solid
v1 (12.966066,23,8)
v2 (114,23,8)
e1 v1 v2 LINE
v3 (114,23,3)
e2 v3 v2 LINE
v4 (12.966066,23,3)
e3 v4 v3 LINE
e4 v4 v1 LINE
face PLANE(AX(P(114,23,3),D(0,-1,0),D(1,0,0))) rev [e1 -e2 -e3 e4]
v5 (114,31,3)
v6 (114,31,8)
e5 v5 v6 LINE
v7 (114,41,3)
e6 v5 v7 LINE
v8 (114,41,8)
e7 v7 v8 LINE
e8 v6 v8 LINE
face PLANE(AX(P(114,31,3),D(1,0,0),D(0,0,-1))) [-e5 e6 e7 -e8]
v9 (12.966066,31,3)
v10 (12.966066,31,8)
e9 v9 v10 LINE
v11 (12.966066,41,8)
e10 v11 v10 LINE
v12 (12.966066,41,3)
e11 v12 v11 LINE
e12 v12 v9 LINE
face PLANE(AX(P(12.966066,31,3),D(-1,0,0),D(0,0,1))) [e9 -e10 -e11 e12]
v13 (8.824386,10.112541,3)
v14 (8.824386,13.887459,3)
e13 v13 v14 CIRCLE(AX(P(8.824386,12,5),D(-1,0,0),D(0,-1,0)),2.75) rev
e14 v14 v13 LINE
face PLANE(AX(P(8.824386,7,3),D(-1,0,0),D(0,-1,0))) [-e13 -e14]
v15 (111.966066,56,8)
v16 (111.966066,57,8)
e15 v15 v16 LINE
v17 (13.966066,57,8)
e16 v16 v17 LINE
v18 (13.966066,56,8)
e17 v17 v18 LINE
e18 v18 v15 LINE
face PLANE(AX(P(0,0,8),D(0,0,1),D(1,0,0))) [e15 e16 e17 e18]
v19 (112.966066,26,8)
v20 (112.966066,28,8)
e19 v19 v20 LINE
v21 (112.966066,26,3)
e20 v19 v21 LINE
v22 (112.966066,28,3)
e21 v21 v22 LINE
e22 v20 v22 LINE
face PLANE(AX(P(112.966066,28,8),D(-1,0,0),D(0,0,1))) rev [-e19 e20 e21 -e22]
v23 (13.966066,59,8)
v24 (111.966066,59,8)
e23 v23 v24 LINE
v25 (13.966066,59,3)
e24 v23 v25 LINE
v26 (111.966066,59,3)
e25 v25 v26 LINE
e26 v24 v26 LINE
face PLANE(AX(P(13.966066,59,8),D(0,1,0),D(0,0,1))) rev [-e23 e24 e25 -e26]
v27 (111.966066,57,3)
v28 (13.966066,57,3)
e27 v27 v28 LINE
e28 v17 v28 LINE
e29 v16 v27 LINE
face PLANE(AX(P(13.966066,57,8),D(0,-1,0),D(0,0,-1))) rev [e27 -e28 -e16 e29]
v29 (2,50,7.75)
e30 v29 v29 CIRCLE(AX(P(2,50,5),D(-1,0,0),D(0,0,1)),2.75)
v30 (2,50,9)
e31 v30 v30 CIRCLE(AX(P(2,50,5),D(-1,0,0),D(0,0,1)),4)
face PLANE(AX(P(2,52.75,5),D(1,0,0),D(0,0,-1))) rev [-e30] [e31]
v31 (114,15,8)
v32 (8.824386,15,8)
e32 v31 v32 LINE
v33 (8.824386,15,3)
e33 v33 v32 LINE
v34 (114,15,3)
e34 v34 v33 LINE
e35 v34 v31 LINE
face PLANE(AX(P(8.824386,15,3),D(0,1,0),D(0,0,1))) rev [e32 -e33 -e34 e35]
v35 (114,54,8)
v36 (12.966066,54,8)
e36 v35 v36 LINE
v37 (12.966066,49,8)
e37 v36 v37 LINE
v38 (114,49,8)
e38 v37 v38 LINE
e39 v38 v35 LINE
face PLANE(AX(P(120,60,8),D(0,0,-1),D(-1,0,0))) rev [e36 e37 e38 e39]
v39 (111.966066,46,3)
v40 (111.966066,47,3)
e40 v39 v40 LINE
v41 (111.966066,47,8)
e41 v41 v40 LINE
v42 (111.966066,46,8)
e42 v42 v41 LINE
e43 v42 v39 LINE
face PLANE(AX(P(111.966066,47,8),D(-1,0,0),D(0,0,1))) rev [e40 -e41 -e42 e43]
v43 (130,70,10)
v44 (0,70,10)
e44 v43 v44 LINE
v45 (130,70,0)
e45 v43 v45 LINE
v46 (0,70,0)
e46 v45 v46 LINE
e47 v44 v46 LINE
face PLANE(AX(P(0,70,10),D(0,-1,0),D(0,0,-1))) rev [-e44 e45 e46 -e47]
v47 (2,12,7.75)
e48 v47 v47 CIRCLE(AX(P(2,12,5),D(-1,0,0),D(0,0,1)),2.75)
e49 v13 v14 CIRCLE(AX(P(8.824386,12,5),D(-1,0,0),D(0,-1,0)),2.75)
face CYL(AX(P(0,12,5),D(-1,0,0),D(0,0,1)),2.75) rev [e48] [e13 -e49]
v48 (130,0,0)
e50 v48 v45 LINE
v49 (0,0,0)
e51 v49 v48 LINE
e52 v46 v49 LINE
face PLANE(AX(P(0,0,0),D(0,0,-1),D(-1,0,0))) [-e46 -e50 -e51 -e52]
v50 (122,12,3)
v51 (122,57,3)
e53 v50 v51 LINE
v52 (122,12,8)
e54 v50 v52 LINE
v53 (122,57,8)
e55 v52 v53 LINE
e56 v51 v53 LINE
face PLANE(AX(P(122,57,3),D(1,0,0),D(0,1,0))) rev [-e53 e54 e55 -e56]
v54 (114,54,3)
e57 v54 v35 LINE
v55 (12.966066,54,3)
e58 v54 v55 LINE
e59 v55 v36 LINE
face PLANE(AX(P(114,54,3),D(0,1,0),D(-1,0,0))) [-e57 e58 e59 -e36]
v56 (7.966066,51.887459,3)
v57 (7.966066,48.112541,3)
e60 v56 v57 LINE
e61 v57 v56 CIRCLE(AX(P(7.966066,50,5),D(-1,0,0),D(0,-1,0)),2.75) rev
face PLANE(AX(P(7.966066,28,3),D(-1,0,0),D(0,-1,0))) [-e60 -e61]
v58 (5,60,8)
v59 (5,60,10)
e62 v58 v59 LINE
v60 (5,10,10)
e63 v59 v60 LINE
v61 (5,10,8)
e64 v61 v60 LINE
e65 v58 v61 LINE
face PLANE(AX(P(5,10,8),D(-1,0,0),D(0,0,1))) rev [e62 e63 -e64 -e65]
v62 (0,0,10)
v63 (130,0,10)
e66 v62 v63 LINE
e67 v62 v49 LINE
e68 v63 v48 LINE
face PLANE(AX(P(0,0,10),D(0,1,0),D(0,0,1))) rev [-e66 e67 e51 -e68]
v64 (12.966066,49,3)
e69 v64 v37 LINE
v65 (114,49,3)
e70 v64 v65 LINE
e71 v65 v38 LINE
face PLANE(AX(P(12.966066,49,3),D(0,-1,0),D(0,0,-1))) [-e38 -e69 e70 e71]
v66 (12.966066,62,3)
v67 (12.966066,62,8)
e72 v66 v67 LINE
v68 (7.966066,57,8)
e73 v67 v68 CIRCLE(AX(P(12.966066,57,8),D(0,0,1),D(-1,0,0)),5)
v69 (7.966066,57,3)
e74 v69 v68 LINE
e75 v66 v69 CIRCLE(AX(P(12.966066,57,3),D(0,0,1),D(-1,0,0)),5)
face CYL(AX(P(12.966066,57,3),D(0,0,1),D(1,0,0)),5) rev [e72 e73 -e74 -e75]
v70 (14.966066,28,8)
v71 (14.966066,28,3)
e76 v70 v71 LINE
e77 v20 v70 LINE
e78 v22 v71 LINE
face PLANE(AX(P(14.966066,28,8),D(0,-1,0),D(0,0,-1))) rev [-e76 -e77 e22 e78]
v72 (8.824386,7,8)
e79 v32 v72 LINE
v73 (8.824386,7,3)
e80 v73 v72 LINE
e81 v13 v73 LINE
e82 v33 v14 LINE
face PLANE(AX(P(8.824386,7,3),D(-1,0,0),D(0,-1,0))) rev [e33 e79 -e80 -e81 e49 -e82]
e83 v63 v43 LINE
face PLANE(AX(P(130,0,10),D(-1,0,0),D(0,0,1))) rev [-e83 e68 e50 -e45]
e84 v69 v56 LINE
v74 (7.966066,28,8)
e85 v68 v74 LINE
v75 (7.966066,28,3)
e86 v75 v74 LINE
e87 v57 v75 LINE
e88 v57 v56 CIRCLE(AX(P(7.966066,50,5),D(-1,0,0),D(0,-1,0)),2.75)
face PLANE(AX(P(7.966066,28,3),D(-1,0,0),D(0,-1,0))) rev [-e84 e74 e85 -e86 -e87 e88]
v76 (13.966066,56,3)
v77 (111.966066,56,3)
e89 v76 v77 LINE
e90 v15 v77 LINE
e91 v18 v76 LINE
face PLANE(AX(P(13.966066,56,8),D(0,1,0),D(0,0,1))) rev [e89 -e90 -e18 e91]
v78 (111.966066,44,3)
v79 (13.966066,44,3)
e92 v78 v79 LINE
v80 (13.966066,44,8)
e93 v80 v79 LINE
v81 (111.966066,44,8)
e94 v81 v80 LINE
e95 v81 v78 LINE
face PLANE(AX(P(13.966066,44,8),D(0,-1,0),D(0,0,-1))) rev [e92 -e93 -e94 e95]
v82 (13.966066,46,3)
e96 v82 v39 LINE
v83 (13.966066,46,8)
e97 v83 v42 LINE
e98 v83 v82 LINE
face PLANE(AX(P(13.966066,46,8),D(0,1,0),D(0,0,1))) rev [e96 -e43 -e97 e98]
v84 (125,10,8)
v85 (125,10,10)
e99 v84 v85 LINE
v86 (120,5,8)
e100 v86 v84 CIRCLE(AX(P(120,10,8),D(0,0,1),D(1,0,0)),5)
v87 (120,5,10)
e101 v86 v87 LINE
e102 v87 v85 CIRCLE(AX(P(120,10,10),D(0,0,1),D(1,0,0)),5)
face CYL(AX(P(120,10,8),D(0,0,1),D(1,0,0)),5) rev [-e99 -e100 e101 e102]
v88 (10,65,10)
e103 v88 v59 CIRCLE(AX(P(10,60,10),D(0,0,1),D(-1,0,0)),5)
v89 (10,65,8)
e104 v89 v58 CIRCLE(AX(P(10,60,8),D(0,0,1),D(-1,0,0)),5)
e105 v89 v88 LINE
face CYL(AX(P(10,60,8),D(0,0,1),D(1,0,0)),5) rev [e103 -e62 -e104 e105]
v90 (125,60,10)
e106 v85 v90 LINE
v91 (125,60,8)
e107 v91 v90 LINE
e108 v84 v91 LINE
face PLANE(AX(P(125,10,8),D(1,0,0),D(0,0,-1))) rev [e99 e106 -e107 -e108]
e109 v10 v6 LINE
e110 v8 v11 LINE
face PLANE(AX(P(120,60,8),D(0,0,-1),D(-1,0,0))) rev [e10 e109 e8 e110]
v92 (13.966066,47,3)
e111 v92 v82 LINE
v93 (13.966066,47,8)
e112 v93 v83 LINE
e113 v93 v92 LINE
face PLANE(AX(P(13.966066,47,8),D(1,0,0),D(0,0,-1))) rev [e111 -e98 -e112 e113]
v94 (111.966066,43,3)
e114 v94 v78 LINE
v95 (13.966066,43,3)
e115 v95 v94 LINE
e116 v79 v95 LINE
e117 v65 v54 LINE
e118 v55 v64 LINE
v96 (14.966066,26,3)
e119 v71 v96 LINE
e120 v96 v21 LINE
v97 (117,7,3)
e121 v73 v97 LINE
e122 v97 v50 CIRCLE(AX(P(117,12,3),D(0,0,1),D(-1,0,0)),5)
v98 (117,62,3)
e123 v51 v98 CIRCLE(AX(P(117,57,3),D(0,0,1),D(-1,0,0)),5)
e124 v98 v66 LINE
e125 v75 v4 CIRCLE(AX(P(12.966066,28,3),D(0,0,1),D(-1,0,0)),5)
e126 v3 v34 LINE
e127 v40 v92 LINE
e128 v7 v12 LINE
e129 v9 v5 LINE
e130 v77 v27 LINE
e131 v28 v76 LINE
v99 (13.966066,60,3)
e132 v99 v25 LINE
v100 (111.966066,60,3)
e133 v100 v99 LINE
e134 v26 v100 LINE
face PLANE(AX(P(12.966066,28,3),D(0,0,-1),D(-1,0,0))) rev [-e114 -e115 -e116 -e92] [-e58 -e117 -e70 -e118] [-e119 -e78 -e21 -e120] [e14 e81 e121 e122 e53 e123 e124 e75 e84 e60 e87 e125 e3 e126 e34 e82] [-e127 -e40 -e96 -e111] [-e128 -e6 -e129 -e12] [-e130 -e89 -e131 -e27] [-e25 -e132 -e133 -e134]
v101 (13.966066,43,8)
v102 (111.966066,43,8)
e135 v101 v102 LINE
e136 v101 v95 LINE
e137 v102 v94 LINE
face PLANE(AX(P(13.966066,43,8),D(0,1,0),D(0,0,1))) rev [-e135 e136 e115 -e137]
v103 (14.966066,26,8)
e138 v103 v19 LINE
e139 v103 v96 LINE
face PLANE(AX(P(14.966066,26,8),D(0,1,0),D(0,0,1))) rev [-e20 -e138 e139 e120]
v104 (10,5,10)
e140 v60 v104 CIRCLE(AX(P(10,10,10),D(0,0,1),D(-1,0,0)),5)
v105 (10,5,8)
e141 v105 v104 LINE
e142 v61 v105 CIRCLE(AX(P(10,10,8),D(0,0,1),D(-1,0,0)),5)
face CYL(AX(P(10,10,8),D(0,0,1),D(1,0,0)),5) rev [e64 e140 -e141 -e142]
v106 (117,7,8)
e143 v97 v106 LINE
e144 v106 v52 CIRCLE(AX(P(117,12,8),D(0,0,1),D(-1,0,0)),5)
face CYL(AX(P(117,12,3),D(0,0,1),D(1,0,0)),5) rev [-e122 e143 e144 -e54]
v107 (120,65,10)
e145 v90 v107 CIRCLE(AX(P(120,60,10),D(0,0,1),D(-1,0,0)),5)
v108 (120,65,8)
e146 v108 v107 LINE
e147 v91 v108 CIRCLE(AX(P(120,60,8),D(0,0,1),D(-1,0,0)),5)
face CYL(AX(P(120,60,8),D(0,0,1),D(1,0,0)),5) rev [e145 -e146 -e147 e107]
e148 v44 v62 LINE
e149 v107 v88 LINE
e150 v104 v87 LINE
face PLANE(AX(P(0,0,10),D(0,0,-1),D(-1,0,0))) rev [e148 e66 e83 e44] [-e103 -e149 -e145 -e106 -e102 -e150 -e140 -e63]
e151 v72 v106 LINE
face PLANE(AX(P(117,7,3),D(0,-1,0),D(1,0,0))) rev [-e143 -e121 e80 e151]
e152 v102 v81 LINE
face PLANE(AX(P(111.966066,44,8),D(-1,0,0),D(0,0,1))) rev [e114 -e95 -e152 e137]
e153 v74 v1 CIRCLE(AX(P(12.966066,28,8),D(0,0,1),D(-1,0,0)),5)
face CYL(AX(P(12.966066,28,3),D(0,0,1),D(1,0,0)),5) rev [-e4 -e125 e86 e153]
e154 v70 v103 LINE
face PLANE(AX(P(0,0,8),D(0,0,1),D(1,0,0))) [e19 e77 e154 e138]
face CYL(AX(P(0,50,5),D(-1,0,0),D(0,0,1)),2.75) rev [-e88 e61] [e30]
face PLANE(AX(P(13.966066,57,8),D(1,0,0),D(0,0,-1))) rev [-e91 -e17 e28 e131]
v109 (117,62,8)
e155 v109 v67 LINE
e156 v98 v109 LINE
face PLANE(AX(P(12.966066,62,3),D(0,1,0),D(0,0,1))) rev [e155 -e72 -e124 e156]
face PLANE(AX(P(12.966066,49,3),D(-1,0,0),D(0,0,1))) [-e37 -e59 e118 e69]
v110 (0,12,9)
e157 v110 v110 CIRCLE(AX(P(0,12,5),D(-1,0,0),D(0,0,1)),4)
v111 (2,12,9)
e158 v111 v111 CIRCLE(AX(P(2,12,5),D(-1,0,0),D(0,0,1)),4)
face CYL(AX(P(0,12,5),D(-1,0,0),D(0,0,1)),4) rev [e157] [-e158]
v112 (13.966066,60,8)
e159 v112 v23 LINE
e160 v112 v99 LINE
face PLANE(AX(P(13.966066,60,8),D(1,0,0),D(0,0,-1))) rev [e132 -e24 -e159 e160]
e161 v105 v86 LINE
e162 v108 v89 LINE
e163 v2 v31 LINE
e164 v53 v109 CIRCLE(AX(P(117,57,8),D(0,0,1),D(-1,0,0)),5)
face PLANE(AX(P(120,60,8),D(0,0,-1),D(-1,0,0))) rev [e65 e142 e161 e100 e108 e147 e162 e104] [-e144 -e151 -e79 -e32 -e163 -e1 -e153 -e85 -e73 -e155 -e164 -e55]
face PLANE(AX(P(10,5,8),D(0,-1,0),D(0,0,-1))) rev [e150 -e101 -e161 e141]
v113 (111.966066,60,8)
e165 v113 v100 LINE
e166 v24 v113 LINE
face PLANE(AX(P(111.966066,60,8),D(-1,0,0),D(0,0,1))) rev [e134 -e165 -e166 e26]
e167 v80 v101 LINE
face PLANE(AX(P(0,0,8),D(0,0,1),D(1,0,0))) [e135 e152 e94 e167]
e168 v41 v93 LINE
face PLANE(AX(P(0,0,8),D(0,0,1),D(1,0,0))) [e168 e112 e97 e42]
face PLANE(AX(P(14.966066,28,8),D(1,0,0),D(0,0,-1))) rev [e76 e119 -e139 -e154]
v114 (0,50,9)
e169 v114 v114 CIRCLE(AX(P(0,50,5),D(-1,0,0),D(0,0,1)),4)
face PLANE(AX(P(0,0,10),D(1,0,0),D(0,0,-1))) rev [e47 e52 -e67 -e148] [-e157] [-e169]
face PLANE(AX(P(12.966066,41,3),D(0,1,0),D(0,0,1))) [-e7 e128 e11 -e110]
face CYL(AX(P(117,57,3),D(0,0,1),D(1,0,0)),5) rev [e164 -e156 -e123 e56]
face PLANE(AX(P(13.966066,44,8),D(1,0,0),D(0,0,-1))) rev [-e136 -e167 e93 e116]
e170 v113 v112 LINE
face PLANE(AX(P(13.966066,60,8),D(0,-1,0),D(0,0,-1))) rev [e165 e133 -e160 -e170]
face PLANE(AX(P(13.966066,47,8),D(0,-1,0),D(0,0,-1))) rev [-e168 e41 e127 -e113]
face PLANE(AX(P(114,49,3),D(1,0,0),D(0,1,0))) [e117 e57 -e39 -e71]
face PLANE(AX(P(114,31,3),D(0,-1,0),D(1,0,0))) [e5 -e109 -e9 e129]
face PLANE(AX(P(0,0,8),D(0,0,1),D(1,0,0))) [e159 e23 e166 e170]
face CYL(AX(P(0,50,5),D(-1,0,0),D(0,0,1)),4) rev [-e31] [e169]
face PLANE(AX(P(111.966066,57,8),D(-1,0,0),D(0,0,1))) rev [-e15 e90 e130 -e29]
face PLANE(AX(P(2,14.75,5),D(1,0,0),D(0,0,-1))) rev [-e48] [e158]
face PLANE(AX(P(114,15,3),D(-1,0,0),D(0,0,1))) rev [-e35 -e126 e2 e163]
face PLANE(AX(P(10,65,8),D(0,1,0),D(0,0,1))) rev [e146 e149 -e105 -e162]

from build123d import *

# Parameters (mm, degrees)
ESQUISSE1_W                                 = 130
ESQUISSE1_H                                 = 70
BOSS_EXTRU_1_DEPTH                          = 10
ENL_V_MAT_EXTRU_1_DEPTH                     = 2
ESQUISSE20_W                                = 101.033933646
ESQUISSE20_H                                = 5
ESQUISSE20_H_2                              = 10
ENL_V_MAT_EXTRU_3_DEPTH                     = 5
CHAMBRAGE_POUR_VIS_SIX_PANS_CREUX_2_R       = 2.75
CHAMBRAGE_POUR_VIS_SIX_PANS_CREUX_M52_DEPTH = 7.966066354
CHAMBRAGE_POUR_VIS_SIX_PANS_CREUX_3_OU_R    = 4
CHAMBRAGE_POUR_VIS_SIX_PANS_CREUX_3_OU_R_2  = 2.75
CHAMBRAGE_POUR_VIS_SIX_PANS_CREUX_3_DEPTH   = 2
CHAMBRAGE_START                             = 7.966066354
CHAMBRAGE_POUR_VIS_SIX_PANS_CREUX_4_OU_R    = 2.75
CHAMBRAGE_POUR_VIS_SIX_PANS_CREUX_4_DEPTH   = 0.858319246
ESQUISSE23_W                                = 98
ESQUISSE23_H                                = 1
ESQUISSE23_H_2                              = 2
BOSS_EXTRU_2_DEPTH                          = 5


# Read off the part's stored shape, not the designer's step: Chambrage pour vis à six pans creux M52
with BuildPart() as part:
    # Esquisse1 → Boss.-Extru.1 (new body)
    with BuildSketch(Plane.XY):
        with Locations((65, 35)):
            Rectangle(ESQUISSE1_W, ESQUISSE1_H)
    extrude(amount=BOSS_EXTRU_1_DEPTH)

    # Esquisse18 → Enlèv. mat.-Extru.1 (cut)
    with BuildSketch(Plane.XY.offset(10)):
        with BuildLine():
            Line((10, 5), (120, 5))
            ThreePointArc((120, 5), (123.535533906, 6.464466094), (125, 10))
            Line((125, 10), (125, 60))
            ThreePointArc((125, 60), (123.535533906, 63.535533906), (120, 65))
            Line((120, 65), (10, 65))
            ThreePointArc((10, 65), (6.464466094, 63.535533906), (5, 60))
            Line((5, 60), (5, 10))
            ThreePointArc((5, 10), (6.464466094, 6.464466094), (10, 5))
        make_face()
    extrude(amount=-ENL_V_MAT_EXTRU_1_DEPTH, mode=Mode.SUBTRACT)

    # Esquisse20 → Enlèv. mat.-Extru.3 (cut)
    with BuildSketch(Plane.XY.offset(8)):
        with BuildLine():
            Line((12.966066354, 62), (117, 62))
            ThreePointArc((117, 62), (120.535533906, 60.535533906), (122, 57))
            Line((122, 57), (122, 12))
            ThreePointArc((122, 12), (120.535533906, 8.464466094), (117, 7))
            Line((117, 7), (8.8243856, 7))
            Line((8.8243856, 7), (8.8243856, 15))
            Line((8.8243856, 15), (114, 15))
            Line((114, 15), (114, 23))
            Line((114, 23), (12.966066354, 23))
            ThreePointArc((12.966066354, 23), (9.430532448, 24.464466094), (7.966066354, 28))
            Line((7.966066354, 28), (7.966066354, 57))
            ThreePointArc((7.966066354, 57), (9.430532448, 60.535533906), (12.966066354, 62))
        make_face()
        with Locations((63.483033177, 51.5)):
            Rectangle(ESQUISSE20_W, ESQUISSE20_H, mode=Mode.SUBTRACT)
        with Locations((63.483033177, 36)):
            Rectangle(ESQUISSE20_W, ESQUISSE20_H_2, mode=Mode.SUBTRACT)
    extrude(amount=-ENL_V_MAT_EXTRU_3_DEPTH, mode=Mode.SUBTRACT)

    # Chambrage pour vis _ six pans creux  2 → Chambrage pour vis à six pans creux M52 (cut)
    with BuildSketch(Plane.YZ):
        with Locations((12, 5)):
            Circle(CHAMBRAGE_POUR_VIS_SIX_PANS_CREUX_2_R)
        with Locations((50, 5)):
            Circle(CHAMBRAGE_POUR_VIS_SIX_PANS_CREUX_2_R)
    extrude(amount=CHAMBRAGE_POUR_VIS_SIX_PANS_CREUX_M52_DEPTH, mode=Mode.SUBTRACT)

    # Chambrage pour vis _ six pans creux 3 ou → Chambrage pour vis _ six pans creux  3 (cut)
    # profile 1 of 2: a face of its own
    with BuildSketch(Plane.YZ):
        with Locations((12, 5)):
            Circle(CHAMBRAGE_POUR_VIS_SIX_PANS_CREUX_3_OU_R)
        with Locations((12, 5)):
            Circle(CHAMBRAGE_POUR_VIS_SIX_PANS_CREUX_3_OU_R_2, mode=Mode.SUBTRACT)
    # profile 2 of 2: a face of its own
    with BuildSketch(Plane.YZ):
        with Locations((50, 5)):
            Circle(CHAMBRAGE_POUR_VIS_SIX_PANS_CREUX_3_OU_R)
        with Locations((50, 5)):
            Circle(CHAMBRAGE_POUR_VIS_SIX_PANS_CREUX_3_OU_R_2, mode=Mode.SUBTRACT)
    extrude(amount=CHAMBRAGE_POUR_VIS_SIX_PANS_CREUX_3_DEPTH, mode=Mode.SUBTRACT)

    # Chambrage pour vis _ six pans creux 4 ou → Chambrage pour vis _ six pans creux  4 (cut)
    with BuildSketch(Plane.YZ.offset(CHAMBRAGE_START)):
        with Locations((12, 5)):
            Circle(CHAMBRAGE_POUR_VIS_SIX_PANS_CREUX_4_OU_R)
    extrude(amount=CHAMBRAGE_POUR_VIS_SIX_PANS_CREUX_4_DEPTH, mode=Mode.SUBTRACT)

    # Esquisse23 → Boss.-Extru.2 (add)
    with BuildSketch(Plane.XY.offset(3)):
        with Locations((62.966066354, 59.5)):
            Rectangle(ESQUISSE23_W, ESQUISSE23_H)
        with Locations((62.966066354, 56.5)):
            Rectangle(ESQUISSE23_W, ESQUISSE23_H)
        with Locations((62.966066354, 46.5)):
            Rectangle(ESQUISSE23_W, ESQUISSE23_H)
        with Locations((62.966066354, 43.5)):
            Rectangle(ESQUISSE23_W, ESQUISSE23_H)
        with Locations((63.966066354, 27)):
            Rectangle(ESQUISSE23_W, ESQUISSE23_H_2)
    extrude(amount=BOSS_EXTRU_2_DEPTH)


solid = part.part
